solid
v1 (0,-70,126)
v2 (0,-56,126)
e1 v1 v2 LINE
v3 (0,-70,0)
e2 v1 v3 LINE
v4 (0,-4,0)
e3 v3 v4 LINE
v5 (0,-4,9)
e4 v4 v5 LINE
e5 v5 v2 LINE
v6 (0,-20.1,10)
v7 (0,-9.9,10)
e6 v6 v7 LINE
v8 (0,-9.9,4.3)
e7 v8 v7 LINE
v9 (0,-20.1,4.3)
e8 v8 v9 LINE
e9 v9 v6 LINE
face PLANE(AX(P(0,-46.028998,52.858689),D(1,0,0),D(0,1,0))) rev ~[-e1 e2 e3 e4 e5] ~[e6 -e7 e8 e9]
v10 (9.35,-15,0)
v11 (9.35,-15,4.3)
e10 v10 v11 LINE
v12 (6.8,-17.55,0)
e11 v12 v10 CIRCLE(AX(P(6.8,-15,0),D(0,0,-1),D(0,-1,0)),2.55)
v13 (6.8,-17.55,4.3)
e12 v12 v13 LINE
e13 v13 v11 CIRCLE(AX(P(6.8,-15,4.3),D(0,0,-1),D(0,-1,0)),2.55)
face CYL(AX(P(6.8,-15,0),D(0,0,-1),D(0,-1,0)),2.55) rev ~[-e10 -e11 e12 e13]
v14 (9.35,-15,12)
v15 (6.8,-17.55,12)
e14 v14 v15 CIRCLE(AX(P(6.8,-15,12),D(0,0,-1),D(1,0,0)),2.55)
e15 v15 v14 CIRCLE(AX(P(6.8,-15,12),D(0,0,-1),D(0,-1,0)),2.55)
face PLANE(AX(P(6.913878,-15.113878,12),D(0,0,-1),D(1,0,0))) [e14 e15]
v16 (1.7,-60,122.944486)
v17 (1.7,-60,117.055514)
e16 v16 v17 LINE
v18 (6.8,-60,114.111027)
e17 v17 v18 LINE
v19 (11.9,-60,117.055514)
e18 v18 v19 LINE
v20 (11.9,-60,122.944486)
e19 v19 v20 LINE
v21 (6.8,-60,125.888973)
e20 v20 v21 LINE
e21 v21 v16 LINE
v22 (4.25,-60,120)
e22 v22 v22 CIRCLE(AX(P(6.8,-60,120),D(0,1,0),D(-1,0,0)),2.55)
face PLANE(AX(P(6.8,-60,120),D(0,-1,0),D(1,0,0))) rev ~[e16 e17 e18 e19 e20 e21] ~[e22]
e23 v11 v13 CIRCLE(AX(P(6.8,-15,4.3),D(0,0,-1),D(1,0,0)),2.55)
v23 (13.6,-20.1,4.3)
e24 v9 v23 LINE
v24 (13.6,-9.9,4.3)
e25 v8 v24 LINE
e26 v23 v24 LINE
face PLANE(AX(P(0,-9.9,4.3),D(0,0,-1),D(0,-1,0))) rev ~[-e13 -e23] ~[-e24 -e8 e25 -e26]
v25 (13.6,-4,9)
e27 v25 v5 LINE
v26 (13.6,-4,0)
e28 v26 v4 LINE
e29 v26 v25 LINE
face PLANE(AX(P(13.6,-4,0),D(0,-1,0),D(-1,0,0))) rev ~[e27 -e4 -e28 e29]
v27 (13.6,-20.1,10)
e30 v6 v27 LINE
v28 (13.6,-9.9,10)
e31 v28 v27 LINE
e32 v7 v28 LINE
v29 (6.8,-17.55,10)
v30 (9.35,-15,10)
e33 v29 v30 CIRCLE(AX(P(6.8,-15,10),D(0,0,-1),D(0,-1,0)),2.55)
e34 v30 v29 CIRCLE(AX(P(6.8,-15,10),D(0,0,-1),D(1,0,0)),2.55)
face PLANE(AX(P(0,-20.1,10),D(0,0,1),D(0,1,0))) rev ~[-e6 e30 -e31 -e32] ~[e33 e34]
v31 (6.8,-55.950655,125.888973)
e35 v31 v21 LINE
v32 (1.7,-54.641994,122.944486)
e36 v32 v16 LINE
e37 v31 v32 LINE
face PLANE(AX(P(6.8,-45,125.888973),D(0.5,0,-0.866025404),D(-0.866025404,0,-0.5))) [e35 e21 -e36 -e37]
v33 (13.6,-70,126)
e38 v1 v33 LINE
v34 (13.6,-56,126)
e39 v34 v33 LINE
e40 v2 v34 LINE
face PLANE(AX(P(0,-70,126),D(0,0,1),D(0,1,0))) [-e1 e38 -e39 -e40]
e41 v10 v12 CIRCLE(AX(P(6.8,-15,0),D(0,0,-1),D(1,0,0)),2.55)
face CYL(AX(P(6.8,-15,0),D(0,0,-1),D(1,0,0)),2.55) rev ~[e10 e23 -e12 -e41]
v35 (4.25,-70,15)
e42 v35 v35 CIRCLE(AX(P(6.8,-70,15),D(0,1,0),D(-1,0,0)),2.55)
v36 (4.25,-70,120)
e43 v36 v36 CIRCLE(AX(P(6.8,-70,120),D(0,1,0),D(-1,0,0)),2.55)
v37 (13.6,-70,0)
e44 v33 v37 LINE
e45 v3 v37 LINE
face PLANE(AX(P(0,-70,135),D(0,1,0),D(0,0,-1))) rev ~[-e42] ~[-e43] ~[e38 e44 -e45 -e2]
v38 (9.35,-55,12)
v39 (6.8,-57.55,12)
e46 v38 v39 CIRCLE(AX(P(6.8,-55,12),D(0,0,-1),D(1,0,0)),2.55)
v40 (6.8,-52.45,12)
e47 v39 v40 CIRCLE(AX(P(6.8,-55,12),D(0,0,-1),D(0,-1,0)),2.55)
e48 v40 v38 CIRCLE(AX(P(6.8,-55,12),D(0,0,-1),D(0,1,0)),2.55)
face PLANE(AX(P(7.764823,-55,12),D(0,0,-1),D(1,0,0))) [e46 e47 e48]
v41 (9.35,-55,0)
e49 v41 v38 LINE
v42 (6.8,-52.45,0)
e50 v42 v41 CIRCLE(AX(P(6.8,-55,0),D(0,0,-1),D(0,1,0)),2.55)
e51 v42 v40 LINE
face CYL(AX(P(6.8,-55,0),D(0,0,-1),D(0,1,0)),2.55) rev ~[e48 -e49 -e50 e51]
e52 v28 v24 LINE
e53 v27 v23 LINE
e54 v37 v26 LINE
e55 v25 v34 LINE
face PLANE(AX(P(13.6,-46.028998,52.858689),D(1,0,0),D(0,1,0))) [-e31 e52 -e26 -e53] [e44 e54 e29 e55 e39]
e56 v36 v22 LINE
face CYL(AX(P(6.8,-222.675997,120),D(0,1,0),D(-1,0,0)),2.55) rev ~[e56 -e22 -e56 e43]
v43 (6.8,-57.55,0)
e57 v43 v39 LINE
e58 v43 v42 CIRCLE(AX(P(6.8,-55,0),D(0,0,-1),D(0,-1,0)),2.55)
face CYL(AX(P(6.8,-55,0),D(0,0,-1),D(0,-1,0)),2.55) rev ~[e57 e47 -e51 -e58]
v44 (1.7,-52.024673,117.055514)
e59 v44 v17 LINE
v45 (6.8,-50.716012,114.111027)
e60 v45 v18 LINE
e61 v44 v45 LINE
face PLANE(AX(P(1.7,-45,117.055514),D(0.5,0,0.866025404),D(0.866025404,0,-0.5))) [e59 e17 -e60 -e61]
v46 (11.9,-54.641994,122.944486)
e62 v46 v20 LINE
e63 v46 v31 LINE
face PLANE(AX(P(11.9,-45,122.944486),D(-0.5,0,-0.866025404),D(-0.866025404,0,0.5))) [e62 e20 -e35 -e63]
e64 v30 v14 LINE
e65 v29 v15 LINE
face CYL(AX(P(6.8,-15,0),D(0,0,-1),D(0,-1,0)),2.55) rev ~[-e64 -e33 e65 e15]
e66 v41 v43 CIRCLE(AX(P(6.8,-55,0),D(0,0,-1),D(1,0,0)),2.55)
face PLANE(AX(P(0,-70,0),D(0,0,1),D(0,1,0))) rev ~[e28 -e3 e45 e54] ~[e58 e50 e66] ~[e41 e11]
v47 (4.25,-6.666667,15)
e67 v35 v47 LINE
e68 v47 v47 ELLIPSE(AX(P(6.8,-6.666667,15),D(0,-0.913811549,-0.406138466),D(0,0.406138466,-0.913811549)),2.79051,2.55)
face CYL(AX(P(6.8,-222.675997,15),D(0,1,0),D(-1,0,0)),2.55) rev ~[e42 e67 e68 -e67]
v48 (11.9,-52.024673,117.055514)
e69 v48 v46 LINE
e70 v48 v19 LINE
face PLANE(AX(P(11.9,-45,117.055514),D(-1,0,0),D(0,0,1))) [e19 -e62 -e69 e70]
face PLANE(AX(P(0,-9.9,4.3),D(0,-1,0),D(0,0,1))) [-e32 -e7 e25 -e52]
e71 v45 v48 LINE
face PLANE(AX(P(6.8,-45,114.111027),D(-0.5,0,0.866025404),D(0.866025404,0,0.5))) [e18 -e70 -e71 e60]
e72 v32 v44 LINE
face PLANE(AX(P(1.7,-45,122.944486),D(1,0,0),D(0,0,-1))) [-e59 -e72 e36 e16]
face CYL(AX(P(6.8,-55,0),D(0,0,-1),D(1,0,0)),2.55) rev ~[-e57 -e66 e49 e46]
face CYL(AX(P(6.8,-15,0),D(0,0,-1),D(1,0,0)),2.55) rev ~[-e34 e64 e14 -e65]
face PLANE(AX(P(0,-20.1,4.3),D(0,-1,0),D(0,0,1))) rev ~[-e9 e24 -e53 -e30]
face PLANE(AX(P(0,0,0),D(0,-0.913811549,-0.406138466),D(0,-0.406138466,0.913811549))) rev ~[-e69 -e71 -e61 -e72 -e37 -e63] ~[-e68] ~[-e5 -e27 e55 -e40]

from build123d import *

# Parameters (mm, degrees)
F1_DEPTH  = 13.6
F3_D      = 5.1
F5_DEPTH  = 12
F6_DEPTH  = 25
F7_DEPTH  = 15
F8_D      = 5.1
F9_W      = 5.1
F9_H      = 5.7
F10_DEPTH = 25
F4_W      = 6.8
F4_H      = 4
F11_DEPTH = 25
F12_DEPTH = 25


# Not quite as in the source:
# - a feature names something its author has since deleted; it is built from what else it names


with BuildPart() as f1:
    # F0 (on Right) → F1 (new body)
    with BuildSketch(Plane.YZ):
        Polygon((-70, 0), (0, 0), (-56, 126), (-70, 126), align=None)
        Polygon((-70, 126), (-56, 126), (-60, 135), (-70, 135), align=None)
    extrude(amount=F1_DEPTH)

    # F3 (through all)
    with Locations(Plane.XZ.offset(70)):
        with Locations((6.8, 15), (6.8, 120)):
            Hole(F3_D / 2)

    # F4 (on face) → F5 (cut)
    with BuildSketch(Plane(origin=(0, 0, 0), x_dir=(1, 0, 0), z_dir=(0, 0, -1))):
        with BuildLine():
            ThreePointArc((9.35, 55), (8.603122292, 56.803122292), (6.8, 57.55))
            Line((6.8, 57.55), (6.8, 55))
            Line((6.8, 55), (6.8, 52.45))
            ThreePointArc((6.8, 52.45), (8.603122292, 53.196877708), (9.35, 55))
        make_face()
        with BuildLine():
            ThreePointArc((9.35, 15), (8.603122292, 16.803122292), (6.8, 17.55))
            ThreePointArc((6.8, 17.55), (4.996877708, 13.196877708), (9.35, 15))
        make_face()
        with BuildLine():
            Line((6.8, 55), (6.8, 57.55))
            ThreePointArc((6.8, 57.55), (4.25, 55), (6.8, 52.45))
            Line((6.8, 52.45), (6.8, 55))
        make_face()
    extrude(amount=-F5_DEPTH, mode=Mode.SUBTRACT)

    # F2 (on face) → F6 (join)
    with BuildSketch(Plane.XZ.offset(70)):
        Polygon((11.9, 122.9444863729), (6.8, 125.8889727457), (1.7, 122.9444863729), (1.7, 117.0555136271), (6.8, 114.1110272543), (11.9, 117.0555136271), align=None)
    extrude(amount=-F6_DEPTH)

    # F7 (cut): a face of the model
    f7_faces = [f1.faces().sort_by_distance(p)[0] for p in [
        (6.8, -45, 120),
    ]]
    extrude(f7_faces, amount=-F7_DEPTH, mode=Mode.SUBTRACT)

    # F8 (through all)
    with Locations(Plane.XZ.offset(70)):
        with Locations((6.8, 120)):
            Hole(F8_D / 2)

    # F9 (on face) → F10 (cut)
    with BuildSketch(Plane(origin=(0, 0, 0), x_dir=(0, -1, 0), z_dir=(-1, 0, 0))):
        with Locations((12.45, 7.15)):
            Rectangle(F9_W, F9_H)
        with Locations((17.55, 7.15)):
            Rectangle(F9_W, F9_H)
    extrude(amount=-F10_DEPTH, mode=Mode.SUBTRACT)

    # F4 (on face) → F11 (cut)
    with BuildSketch(Plane(origin=(0, 0, 0), x_dir=(1, 0, 0), z_dir=(0, 0, -1))):
        with Locations((10.2, 2)):
            Rectangle(F4_W, F4_H)
        with Locations((3.4, 2)):
            Rectangle(F4_W, F4_H)
    extrude(amount=-F11_DEPTH, mode=Mode.SUBTRACT)

    # F0 (on Right) → F12 (cut)
    with BuildSketch(Plane.YZ):
        Polygon((-70, 126), (-56, 126), (-60, 135), (-70, 135), align=None)
    extrude(amount=F12_DEPTH, mode=Mode.SUBTRACT)


solid = f1.part
